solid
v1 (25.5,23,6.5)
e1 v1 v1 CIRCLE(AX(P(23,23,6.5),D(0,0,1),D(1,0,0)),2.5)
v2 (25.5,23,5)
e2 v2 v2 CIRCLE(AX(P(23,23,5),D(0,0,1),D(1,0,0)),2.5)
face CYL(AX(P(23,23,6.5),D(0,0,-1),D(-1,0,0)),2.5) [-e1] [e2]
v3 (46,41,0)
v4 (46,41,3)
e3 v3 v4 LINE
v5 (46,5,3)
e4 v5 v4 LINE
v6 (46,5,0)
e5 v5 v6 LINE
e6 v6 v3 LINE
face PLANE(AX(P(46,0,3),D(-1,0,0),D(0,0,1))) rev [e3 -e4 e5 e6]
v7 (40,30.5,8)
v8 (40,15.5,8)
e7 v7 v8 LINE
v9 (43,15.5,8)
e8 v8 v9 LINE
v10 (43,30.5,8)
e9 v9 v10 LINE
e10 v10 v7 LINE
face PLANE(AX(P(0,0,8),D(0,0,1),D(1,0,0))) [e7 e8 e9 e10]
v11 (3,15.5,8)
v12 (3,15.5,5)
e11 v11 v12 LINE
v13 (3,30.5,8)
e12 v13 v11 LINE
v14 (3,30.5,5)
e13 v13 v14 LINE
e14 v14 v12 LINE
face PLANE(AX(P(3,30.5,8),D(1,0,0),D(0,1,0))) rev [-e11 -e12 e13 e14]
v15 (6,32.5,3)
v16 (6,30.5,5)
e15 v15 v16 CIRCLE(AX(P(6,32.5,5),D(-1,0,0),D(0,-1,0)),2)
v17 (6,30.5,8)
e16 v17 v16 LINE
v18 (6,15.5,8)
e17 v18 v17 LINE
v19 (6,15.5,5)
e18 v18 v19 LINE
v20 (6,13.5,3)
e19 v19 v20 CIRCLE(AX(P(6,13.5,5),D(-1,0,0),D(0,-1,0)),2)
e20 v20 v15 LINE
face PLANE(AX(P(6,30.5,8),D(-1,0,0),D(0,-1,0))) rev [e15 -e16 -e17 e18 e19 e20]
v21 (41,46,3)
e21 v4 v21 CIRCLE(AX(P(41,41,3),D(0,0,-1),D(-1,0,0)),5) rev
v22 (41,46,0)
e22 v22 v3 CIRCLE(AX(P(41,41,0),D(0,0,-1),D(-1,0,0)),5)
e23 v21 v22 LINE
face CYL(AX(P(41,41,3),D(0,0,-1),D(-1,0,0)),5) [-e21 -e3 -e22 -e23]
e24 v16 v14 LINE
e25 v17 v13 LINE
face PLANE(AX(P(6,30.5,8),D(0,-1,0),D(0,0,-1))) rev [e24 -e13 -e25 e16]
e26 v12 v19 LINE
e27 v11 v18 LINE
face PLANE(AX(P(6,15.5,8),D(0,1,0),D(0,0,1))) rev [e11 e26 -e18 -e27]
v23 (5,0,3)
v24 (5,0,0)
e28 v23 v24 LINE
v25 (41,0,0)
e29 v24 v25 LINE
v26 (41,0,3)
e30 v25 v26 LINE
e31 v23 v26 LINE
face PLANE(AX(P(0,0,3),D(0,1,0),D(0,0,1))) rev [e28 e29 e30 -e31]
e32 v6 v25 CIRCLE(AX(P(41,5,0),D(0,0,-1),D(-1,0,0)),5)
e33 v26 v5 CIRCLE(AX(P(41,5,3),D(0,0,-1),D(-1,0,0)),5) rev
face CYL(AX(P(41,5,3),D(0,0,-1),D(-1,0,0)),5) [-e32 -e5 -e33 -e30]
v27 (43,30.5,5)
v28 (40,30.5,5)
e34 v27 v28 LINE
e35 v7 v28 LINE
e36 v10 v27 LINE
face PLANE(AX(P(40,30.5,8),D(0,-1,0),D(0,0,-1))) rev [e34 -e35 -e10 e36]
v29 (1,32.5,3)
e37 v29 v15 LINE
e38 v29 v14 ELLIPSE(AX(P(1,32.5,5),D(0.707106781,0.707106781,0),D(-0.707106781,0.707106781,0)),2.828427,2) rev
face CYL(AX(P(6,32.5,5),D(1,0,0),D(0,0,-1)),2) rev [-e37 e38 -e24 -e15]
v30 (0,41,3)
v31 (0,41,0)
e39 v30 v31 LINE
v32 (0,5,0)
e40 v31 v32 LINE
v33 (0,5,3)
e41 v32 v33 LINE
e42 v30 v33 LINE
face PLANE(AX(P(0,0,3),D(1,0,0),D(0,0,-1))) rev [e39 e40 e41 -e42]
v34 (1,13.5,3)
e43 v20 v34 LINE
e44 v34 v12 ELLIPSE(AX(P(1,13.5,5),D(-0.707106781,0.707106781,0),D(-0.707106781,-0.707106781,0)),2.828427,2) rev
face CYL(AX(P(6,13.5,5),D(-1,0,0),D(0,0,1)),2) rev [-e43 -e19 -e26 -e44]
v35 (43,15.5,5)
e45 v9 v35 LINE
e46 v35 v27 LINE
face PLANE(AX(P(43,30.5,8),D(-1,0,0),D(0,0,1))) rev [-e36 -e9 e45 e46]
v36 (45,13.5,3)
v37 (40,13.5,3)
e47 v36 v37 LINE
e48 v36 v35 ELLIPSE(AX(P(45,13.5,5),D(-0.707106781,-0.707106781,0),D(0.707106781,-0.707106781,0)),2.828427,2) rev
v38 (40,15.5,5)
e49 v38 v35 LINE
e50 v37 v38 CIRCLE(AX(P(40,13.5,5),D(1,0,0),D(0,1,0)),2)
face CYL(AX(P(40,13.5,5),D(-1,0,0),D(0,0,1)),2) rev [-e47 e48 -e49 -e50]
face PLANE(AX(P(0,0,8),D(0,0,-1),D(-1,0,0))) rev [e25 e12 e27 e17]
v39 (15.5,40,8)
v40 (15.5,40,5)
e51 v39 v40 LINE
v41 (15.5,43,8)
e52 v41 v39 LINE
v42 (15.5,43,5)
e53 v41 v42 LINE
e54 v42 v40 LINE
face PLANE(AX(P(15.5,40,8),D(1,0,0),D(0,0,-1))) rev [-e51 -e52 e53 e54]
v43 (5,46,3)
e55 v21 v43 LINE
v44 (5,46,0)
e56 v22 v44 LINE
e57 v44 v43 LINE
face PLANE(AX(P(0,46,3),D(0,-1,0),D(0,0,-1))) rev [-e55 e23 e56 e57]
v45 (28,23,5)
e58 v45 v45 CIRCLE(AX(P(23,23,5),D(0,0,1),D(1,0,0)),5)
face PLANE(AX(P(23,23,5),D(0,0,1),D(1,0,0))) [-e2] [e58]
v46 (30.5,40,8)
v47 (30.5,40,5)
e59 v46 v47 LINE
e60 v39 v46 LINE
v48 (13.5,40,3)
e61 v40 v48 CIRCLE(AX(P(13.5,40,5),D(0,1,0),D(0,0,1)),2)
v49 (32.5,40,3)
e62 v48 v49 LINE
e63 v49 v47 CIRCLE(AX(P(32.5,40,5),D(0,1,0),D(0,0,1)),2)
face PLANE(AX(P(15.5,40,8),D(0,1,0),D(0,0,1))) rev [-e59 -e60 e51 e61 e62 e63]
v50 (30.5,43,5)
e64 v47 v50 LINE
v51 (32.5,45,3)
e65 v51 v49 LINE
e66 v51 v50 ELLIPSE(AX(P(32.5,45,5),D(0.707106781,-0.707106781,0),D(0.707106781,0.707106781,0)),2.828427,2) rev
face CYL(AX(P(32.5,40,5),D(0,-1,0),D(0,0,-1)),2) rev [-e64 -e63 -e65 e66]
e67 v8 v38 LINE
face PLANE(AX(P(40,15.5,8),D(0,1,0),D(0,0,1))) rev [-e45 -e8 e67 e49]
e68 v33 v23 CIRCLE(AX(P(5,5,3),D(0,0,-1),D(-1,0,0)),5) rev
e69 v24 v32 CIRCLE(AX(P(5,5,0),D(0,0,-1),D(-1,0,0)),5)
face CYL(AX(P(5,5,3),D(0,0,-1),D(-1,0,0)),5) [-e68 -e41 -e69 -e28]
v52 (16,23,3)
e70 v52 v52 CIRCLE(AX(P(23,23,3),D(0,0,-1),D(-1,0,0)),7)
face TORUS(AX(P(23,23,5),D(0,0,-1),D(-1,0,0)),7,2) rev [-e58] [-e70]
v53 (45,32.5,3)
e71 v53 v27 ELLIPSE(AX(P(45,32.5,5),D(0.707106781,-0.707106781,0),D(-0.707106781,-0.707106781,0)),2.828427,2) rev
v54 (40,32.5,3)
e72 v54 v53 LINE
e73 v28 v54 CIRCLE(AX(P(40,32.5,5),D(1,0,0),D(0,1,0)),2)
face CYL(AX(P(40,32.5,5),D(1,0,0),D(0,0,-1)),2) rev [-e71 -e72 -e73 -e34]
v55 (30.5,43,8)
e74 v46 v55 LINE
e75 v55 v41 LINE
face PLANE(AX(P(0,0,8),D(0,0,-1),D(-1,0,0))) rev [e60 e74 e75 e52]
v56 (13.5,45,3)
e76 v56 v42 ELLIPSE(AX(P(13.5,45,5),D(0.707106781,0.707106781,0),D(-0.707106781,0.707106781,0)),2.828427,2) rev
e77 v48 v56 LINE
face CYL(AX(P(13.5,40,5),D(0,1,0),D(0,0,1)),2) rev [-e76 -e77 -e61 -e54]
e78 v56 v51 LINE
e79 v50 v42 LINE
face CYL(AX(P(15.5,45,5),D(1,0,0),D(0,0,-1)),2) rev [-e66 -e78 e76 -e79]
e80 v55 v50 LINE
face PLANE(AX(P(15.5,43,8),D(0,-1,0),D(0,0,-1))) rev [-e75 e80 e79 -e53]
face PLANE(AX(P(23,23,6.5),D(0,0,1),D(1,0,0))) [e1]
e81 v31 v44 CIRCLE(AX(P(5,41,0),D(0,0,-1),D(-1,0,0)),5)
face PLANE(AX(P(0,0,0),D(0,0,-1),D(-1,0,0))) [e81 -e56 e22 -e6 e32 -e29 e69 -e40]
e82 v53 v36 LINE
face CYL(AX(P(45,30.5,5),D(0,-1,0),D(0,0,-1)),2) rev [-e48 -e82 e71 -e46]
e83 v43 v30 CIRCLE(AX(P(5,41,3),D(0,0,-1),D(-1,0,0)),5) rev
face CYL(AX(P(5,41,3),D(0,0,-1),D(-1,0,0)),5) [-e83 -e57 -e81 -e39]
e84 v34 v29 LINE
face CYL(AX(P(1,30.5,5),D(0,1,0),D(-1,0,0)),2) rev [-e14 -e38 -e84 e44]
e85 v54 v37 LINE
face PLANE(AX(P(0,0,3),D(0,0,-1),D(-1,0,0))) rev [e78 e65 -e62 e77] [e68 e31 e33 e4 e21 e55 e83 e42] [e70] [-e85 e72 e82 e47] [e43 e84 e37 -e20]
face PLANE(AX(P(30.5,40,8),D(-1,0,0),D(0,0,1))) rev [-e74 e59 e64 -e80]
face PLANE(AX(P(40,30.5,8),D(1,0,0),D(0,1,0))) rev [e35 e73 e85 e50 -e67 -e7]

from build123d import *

# Parameters (mm, degrees)
SKETCH_1_W      = 46
SKETCH_1_H      = 46
EXTRUDE_1_DEPTH = 3
SKETCH_3_R      = 5
EXTRUDE_2_DEPTH = 2
SKETCH_4_R      = 2.5
EXTRUDE_3_DEPTH = 1.5
FILLET_1_R      = 5
FILLET_2_R      = 2
SKETCH_5_W      = 3
SKETCH_5_H      = 15
SKETCH_5_W_2    = 15
SKETCH_5_H_2    = 3
EXTRUDE_4_DEPTH = 5
FILLET_3_R      = 2


with BuildPart() as part:
    # ｽｹｯﾁ1 → ﾎﾞｽ - 押し出し1 (new body)
    with BuildSketch(Plane.XY):
        with Locations((23, 23)):
            Rectangle(SKETCH_1_W, SKETCH_1_H)
    extrude(amount=EXTRUDE_1_DEPTH)

    # ｽｹｯﾁ3 → ﾎﾞｽ - 押し出し2 (add)
    with BuildSketch(Plane.XY.offset(3)):
        with Locations((23, 23)):
            Circle(SKETCH_3_R)
    extrude(amount=EXTRUDE_2_DEPTH)

    # ｽｹｯﾁ4 → ﾎﾞｽ - 押し出し3 (add)
    with BuildSketch(Plane.XY.offset(5)):
        with Locations((23, 23)):
            Circle(SKETCH_4_R)
    extrude(amount=EXTRUDE_3_DEPTH)

    # ﾌｨﾚｯﾄ1
    fillet_1_edges = [part.edges().sort_by_distance(p)[0] for p in [
        (0, 46, 1.5),
        (46, 46, 1.5),
        (46, 0, 1.5),
        (0, 0, 1.5),
    ]]
    fillet(fillet_1_edges, radius=FILLET_1_R)

    # ﾌｨﾚｯﾄ2
    fillet_2_edges = [part.edges().sort_by_distance(p)[0] for p in [
        (18, 23, 3),
    ]]
    fillet(fillet_2_edges, radius=FILLET_2_R - 0.0001)  # a hair under: the kernel refuses the full size

    # ｽｹｯﾁ5 → ﾎﾞｽ - 押し出し4 (add)
    with BuildSketch(Plane.XY.offset(3)):
        with Locations((4.5, 23)):
            Rectangle(SKETCH_5_W, SKETCH_5_H)
        with Locations((23, 41.5)):
            Rectangle(SKETCH_5_W_2, SKETCH_5_H_2)
        with Locations((41.5, 23)):
            Rectangle(SKETCH_5_W, SKETCH_5_H)
    extrude(amount=EXTRUDE_4_DEPTH)

    # ﾌｨﾚｯﾄ3
    fillet_3_edges = [part.edges().sort_by_distance(p)[0] for p in [
        (4.5, 30.5, 3),
        (3, 23, 3),
        (4.5, 15.5, 3),
        (15.5, 41.5, 3),
        (30.5, 41.5, 3),
        (23, 43, 3),
        (41.5, 15.5, 3),
        (43, 23, 3),
        (41.5, 30.5, 3),
    ]]
    fillet(fillet_3_edges, radius=FILLET_3_R)


solid = part.part
